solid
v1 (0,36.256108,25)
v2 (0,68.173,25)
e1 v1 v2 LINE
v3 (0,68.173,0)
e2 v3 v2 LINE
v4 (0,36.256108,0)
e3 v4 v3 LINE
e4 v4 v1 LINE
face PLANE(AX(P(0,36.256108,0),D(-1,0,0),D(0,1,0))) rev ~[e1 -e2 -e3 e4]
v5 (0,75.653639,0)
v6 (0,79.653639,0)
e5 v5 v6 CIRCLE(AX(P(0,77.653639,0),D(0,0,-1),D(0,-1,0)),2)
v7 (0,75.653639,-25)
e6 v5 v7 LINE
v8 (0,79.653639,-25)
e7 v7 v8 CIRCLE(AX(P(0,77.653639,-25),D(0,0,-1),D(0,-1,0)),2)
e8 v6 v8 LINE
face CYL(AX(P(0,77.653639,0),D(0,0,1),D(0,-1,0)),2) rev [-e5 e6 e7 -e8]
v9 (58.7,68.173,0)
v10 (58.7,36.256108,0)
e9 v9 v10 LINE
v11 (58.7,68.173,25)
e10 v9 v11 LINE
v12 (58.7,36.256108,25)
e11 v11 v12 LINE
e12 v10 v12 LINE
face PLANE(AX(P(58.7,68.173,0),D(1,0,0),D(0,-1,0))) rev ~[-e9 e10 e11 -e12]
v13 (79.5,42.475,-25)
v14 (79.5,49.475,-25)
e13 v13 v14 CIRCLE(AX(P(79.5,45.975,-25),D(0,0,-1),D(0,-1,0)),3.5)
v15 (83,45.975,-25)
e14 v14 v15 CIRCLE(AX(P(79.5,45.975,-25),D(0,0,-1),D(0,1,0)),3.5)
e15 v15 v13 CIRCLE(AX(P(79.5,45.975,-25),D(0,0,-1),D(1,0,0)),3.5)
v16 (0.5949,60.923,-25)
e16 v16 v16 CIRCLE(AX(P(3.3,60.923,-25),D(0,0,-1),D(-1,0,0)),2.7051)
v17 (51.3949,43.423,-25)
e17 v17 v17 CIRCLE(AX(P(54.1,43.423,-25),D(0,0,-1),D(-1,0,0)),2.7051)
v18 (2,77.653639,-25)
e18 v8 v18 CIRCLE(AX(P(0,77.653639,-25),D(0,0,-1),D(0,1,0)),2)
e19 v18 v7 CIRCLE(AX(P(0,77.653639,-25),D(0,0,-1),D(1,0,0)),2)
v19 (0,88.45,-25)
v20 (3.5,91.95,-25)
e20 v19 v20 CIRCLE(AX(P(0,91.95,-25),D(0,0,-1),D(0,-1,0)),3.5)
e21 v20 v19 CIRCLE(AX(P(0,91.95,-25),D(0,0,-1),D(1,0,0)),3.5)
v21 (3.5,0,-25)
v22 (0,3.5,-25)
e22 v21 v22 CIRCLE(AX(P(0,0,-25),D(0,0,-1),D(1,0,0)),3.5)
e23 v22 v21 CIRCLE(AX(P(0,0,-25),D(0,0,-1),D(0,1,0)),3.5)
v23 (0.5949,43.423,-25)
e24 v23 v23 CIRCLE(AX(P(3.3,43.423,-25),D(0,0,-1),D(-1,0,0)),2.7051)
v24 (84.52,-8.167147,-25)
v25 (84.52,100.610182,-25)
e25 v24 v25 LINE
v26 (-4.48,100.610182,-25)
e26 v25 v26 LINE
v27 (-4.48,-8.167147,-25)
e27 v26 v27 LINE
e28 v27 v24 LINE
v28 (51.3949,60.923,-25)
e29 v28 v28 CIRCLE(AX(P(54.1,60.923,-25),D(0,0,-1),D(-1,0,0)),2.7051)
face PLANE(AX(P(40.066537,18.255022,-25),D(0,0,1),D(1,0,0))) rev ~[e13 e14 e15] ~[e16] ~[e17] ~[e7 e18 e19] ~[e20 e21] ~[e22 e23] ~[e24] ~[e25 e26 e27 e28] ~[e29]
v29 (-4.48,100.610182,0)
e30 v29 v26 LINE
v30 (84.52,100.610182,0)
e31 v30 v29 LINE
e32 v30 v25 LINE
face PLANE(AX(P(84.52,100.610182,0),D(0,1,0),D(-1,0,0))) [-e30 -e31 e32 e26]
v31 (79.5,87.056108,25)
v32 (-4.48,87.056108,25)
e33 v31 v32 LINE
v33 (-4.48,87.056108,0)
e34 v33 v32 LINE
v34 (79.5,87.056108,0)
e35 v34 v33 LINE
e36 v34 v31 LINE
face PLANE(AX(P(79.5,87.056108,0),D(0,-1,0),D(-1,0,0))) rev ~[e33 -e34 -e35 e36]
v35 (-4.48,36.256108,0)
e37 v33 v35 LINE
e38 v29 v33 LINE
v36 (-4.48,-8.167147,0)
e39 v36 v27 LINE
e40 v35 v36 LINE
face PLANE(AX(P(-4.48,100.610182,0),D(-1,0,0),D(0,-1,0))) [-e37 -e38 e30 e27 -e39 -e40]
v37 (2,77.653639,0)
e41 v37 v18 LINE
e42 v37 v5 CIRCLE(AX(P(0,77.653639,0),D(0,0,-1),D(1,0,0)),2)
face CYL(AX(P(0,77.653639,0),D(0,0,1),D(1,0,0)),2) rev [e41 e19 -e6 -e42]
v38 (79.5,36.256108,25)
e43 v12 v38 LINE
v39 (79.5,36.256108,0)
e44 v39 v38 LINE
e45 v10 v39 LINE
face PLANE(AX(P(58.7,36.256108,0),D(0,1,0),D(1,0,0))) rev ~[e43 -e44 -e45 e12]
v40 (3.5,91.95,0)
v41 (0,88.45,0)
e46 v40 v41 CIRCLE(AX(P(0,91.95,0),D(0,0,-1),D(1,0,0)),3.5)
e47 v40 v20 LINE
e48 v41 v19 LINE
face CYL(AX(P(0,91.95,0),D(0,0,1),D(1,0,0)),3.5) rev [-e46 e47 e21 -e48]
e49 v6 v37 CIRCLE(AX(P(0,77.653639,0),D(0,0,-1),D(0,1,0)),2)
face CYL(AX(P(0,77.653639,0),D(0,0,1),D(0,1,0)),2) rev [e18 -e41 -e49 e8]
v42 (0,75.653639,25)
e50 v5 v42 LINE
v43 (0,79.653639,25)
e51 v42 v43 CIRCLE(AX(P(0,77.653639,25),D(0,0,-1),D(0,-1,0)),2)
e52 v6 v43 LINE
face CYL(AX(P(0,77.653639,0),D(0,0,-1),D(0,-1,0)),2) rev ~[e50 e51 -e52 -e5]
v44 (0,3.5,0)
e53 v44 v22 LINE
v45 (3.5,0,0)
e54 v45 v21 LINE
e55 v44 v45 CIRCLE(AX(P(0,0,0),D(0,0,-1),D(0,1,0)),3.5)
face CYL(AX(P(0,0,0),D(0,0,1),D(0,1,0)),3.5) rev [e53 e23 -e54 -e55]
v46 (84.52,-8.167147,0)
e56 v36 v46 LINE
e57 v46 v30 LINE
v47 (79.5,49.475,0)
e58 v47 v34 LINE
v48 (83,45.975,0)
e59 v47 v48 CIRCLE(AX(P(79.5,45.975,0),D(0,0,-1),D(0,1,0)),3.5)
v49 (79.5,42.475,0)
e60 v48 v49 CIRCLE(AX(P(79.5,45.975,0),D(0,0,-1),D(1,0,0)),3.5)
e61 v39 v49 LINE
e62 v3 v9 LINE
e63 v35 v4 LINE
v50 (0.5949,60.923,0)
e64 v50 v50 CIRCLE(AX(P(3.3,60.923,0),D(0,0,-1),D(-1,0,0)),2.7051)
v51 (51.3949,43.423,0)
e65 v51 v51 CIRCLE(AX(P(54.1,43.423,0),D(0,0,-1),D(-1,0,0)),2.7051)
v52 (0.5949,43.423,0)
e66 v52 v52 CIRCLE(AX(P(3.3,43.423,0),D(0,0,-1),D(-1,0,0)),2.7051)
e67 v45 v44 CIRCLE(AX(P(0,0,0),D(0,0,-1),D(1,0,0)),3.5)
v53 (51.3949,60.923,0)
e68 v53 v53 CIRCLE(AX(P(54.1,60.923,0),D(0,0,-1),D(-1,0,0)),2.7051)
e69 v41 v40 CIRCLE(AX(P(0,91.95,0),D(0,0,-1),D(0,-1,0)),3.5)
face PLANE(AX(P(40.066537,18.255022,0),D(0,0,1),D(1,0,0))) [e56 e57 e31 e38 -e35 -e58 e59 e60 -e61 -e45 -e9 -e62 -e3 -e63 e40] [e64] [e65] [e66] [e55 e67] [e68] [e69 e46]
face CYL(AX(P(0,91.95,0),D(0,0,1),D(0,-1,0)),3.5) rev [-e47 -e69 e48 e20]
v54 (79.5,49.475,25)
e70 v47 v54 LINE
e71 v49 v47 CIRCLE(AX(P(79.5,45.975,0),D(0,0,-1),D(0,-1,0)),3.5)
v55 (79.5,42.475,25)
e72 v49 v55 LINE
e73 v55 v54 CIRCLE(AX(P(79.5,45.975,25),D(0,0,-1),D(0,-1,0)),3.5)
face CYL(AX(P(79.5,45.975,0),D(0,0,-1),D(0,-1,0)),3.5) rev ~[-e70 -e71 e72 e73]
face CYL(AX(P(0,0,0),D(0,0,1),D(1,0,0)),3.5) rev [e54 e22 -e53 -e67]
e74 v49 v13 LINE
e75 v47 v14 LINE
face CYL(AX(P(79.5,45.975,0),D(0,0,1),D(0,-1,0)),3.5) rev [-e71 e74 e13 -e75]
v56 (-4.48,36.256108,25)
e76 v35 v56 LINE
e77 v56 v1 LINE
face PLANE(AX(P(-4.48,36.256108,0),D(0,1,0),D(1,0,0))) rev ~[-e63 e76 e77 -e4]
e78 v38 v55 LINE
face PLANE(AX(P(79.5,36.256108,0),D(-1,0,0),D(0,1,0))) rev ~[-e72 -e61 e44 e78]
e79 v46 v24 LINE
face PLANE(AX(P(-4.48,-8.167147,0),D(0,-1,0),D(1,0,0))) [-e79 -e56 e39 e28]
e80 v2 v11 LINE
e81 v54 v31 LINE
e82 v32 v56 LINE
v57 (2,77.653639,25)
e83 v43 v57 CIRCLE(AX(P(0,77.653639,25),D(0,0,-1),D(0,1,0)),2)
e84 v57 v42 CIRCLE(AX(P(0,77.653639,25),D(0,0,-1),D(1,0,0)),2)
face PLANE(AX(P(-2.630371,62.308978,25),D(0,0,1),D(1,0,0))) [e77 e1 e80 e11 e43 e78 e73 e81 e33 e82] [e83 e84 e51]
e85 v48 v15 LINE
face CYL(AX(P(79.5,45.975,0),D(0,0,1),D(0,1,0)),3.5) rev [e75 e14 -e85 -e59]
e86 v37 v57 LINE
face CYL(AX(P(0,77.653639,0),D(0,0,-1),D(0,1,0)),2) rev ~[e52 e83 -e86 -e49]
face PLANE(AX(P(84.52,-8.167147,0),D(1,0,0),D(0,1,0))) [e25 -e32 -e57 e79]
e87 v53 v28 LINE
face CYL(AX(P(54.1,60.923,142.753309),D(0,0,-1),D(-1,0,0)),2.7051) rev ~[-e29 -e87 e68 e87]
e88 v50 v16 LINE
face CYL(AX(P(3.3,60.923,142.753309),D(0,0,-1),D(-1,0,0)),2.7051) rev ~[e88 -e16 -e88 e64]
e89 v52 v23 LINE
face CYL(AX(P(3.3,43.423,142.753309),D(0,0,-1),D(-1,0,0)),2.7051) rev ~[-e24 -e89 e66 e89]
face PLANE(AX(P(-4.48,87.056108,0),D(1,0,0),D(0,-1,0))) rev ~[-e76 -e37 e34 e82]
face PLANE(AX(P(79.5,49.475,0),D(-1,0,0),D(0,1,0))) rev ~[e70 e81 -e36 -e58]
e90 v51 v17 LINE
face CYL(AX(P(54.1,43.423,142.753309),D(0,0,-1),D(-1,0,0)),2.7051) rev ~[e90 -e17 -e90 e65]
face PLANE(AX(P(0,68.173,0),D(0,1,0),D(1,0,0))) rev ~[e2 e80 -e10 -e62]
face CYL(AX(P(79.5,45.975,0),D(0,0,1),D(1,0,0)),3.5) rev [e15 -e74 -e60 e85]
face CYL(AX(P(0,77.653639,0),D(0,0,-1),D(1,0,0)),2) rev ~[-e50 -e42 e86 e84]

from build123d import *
from build123d import SkipClean  # not in build123d's __all__

# Parameters (mm, degrees)
F0_W     = 58.7
F0_H     = 31.916891567
F0_W_2   = 50.8
F0_H_2   = 17.5
F0_W_3   = 1.3
F0_H_3   = 0.083108433
F1_DEPTH = 25
F2_D     = 5.4102
F3_DEPTH = 25


with BuildPart() as f1:
    # F0 (on Top) → F1 (new body)
    with BuildSketch(Plane.XY):
        with BuildLine():
            ThreePointArc((0, 3.5), (2.4748737342, 2.4748737342), (3.5, 0))
            Line((3.5, 0), (79.5, 0))
            Line((79.5, 0), (79.5, 36.256108433))
            Line((79.5, 36.256108433), (58.7, 36.256108433))
            Line((58.7, 36.256108433), (58.7, 36.173))
            Line((58.7, 36.173), (0, 36.173))
            Line((0, 36.173), (0, 3.5))
        make_face()
        with BuildLine():
            Line((58.7, 36.256108433), (79.5, 36.256108433))
            Line((79.5, 36.256108433), (79.5, 42.475))
            ThreePointArc((79.5, 42.475), (76, 45.975), (79.5, 49.475))
            Line((79.5, 49.475), (79.5, 87.056108433))
            Line((79.5, 87.056108433), (0, 87.056108433))
            Line((0, 87.056108433), (0, 79.6536390185))
            ThreePointArc((0, 79.6536390185), (1.4142135624, 79.0678525809), (2, 77.6536390185))
            ThreePointArc((2, 77.6536390185), (1.4142135624, 76.2394254562), (0, 75.6536390185))
            Line((0, 75.6536390185), (0, 68.173))
            Line((0, 68.173), (58.7, 68.173))
            Line((58.7, 68.173), (58.7, 36.256108433))
        make_face()
        with Locations((29.35, 52.2145542165)):
            Rectangle(F0_W, F0_H)
        with Locations((28.7, 52.173)):
            Rectangle(F0_W_2, F0_H_2, mode=Mode.SUBTRACT)
        with BuildLine():
            Line((79.5, 0), (3.5, 0))
            ThreePointArc((3.5, 0), (-2.4748737342, -2.4748737342), (0, 3.5))
            Line((0, 3.5), (0, 36.173))
            Line((0, 36.173), (-1.3, 36.173))
            Line((-1.3, 36.173), (-1.3, 36.256108433))
            Line((-1.3, 36.256108433), (-4.48, 36.256108433))
            Line((-4.48, 36.256108433), (-4.48, -8.1671467051))
            Line((-4.48, -8.1671467051), (84.52, -8.1671467051))
            Line((84.52, -8.1671467051), (84.52, 36.256108433))
            Line((84.52, 36.256108433), (79.5, 36.256108433))
            Line((79.5, 36.256108433), (79.5, 0))
        make_face()
        with Locations((28.7, 52.173)):
            Rectangle(F0_W_2, F0_H_2)
        with BuildLine():
            Line((79.5, 87.056108433), (84.52, 87.056108433))
            Line((84.52, 87.056108433), (84.52, 100.6101816893))
            Line((84.52, 100.6101816893), (28.7, 100.6101816893))
            Line((28.7, 100.6101816893), (-4.48, 100.6101816893))
            Line((-4.48, 100.6101816893), (-4.48, 87.056108433))
            Line((-4.48, 87.056108433), (0, 87.056108433))
            Line((0, 87.056108433), (0, 88.45))
            ThreePointArc((0, 88.45), (-2.4748737342, 94.4248737342), (3.5, 91.95))
            Line((3.5, 91.95), (79.5, 91.95))
            Line((79.5, 91.95), (79.5, 87.056108433))
        make_face()
        with BuildLine():
            Line((0, 87.056108433), (79.5, 87.056108433))
            Line((79.5, 87.056108433), (79.5, 91.95))
            Line((79.5, 91.95), (3.5, 91.95))
            ThreePointArc((3.5, 91.95), (2.4748737342, 89.4751262658), (0, 88.45))
            Line((0, 88.45), (0, 87.056108433))
        make_face()
        with BuildLine():
            Line((79.5, 42.475), (79.5, 36.256108433))
            Line((79.5, 36.256108433), (84.52, 36.256108433))
            Line((84.52, 36.256108433), (84.52, 87.056108433))
            Line((84.52, 87.056108433), (79.5, 87.056108433))
            Line((79.5, 87.056108433), (79.5, 49.475))
            ThreePointArc((79.5, 49.475), (81.9748737342, 48.4498737342), (83, 45.975))
            ThreePointArc((83, 45.975), (81.9748737342, 43.5001262658), (79.5, 42.475))
        make_face()
        with BuildLine():
            Line((-1.3, 68.173), (0, 68.173))
            Line((0, 68.173), (0, 75.6536390185))
            ThreePointArc((0, 75.6536390185), (-2, 77.6536390185), (0, 79.6536390185))
            Line((0, 79.6536390185), (0, 87.056108433))
            Line((0, 87.056108433), (-4.48, 87.056108433))
            Line((-4.48, 87.056108433), (-4.48, 36.256108433))
            Line((-4.48, 36.256108433), (-1.3, 36.256108433))
            Line((-1.3, 36.256108433), (-1.3, 68.173))
        make_face()
        with Locations((-0.65, 52.2145542165)):
            Rectangle(F0_W_3, F0_H)
        with Locations((29.35, 36.2145542165)):
            Rectangle(F0_W, F0_H_3)
        with Locations((-0.65, 36.2145542165)):
            Rectangle(F0_W_3, F0_H_3)
    extrude(amount=-F1_DEPTH)

    # F2 (through all)
    with Locations(Plane.XY):
        with Locations((3.3, 60.923), (3.3, 43.423), (54.1, 43.423), (54.1, 60.923)):
            Hole(F2_D / 2)

    # F0 (on Top) → F3 (join)
    with BuildSketch(Plane.XY):
        with BuildLine():
            Line((-1.3, 68.173), (0, 68.173))
            Line((0, 68.173), (0, 75.6536390185))
            ThreePointArc((0, 75.6536390185), (-2, 77.6536390185), (0, 79.6536390185))
            Line((0, 79.6536390185), (0, 87.056108433))
            Line((0, 87.056108433), (-4.48, 87.056108433))
            Line((-4.48, 87.056108433), (-4.48, 36.256108433))
            Line((-4.48, 36.256108433), (-1.3, 36.256108433))
            Line((-1.3, 36.256108433), (-1.3, 68.173))
        make_face()
        with BuildLine():
            Line((58.7, 36.256108433), (79.5, 36.256108433))
            Line((79.5, 36.256108433), (79.5, 42.475))
            ThreePointArc((79.5, 42.475), (76, 45.975), (79.5, 49.475))
            Line((79.5, 49.475), (79.5, 87.056108433))
            Line((79.5, 87.056108433), (0, 87.056108433))
            Line((0, 87.056108433), (0, 79.6536390185))
            ThreePointArc((0, 79.6536390185), (1.4142135624, 79.0678525809), (2, 77.6536390185))
            ThreePointArc((2, 77.6536390185), (1.4142135624, 76.2394254562), (0, 75.6536390185))
            Line((0, 75.6536390185), (0, 68.173))
            Line((0, 68.173), (58.7, 68.173))
            Line((58.7, 68.173), (58.7, 36.256108433))
        make_face()
        with Locations((-0.65, 52.2145542165)):
            Rectangle(F0_W_3, F0_H)
    with SkipClean():  # cleaning this boolean's faces spoils the solid; the shape is the same uncleaned
        extrude(amount=F3_DEPTH)


solid = f1.part
